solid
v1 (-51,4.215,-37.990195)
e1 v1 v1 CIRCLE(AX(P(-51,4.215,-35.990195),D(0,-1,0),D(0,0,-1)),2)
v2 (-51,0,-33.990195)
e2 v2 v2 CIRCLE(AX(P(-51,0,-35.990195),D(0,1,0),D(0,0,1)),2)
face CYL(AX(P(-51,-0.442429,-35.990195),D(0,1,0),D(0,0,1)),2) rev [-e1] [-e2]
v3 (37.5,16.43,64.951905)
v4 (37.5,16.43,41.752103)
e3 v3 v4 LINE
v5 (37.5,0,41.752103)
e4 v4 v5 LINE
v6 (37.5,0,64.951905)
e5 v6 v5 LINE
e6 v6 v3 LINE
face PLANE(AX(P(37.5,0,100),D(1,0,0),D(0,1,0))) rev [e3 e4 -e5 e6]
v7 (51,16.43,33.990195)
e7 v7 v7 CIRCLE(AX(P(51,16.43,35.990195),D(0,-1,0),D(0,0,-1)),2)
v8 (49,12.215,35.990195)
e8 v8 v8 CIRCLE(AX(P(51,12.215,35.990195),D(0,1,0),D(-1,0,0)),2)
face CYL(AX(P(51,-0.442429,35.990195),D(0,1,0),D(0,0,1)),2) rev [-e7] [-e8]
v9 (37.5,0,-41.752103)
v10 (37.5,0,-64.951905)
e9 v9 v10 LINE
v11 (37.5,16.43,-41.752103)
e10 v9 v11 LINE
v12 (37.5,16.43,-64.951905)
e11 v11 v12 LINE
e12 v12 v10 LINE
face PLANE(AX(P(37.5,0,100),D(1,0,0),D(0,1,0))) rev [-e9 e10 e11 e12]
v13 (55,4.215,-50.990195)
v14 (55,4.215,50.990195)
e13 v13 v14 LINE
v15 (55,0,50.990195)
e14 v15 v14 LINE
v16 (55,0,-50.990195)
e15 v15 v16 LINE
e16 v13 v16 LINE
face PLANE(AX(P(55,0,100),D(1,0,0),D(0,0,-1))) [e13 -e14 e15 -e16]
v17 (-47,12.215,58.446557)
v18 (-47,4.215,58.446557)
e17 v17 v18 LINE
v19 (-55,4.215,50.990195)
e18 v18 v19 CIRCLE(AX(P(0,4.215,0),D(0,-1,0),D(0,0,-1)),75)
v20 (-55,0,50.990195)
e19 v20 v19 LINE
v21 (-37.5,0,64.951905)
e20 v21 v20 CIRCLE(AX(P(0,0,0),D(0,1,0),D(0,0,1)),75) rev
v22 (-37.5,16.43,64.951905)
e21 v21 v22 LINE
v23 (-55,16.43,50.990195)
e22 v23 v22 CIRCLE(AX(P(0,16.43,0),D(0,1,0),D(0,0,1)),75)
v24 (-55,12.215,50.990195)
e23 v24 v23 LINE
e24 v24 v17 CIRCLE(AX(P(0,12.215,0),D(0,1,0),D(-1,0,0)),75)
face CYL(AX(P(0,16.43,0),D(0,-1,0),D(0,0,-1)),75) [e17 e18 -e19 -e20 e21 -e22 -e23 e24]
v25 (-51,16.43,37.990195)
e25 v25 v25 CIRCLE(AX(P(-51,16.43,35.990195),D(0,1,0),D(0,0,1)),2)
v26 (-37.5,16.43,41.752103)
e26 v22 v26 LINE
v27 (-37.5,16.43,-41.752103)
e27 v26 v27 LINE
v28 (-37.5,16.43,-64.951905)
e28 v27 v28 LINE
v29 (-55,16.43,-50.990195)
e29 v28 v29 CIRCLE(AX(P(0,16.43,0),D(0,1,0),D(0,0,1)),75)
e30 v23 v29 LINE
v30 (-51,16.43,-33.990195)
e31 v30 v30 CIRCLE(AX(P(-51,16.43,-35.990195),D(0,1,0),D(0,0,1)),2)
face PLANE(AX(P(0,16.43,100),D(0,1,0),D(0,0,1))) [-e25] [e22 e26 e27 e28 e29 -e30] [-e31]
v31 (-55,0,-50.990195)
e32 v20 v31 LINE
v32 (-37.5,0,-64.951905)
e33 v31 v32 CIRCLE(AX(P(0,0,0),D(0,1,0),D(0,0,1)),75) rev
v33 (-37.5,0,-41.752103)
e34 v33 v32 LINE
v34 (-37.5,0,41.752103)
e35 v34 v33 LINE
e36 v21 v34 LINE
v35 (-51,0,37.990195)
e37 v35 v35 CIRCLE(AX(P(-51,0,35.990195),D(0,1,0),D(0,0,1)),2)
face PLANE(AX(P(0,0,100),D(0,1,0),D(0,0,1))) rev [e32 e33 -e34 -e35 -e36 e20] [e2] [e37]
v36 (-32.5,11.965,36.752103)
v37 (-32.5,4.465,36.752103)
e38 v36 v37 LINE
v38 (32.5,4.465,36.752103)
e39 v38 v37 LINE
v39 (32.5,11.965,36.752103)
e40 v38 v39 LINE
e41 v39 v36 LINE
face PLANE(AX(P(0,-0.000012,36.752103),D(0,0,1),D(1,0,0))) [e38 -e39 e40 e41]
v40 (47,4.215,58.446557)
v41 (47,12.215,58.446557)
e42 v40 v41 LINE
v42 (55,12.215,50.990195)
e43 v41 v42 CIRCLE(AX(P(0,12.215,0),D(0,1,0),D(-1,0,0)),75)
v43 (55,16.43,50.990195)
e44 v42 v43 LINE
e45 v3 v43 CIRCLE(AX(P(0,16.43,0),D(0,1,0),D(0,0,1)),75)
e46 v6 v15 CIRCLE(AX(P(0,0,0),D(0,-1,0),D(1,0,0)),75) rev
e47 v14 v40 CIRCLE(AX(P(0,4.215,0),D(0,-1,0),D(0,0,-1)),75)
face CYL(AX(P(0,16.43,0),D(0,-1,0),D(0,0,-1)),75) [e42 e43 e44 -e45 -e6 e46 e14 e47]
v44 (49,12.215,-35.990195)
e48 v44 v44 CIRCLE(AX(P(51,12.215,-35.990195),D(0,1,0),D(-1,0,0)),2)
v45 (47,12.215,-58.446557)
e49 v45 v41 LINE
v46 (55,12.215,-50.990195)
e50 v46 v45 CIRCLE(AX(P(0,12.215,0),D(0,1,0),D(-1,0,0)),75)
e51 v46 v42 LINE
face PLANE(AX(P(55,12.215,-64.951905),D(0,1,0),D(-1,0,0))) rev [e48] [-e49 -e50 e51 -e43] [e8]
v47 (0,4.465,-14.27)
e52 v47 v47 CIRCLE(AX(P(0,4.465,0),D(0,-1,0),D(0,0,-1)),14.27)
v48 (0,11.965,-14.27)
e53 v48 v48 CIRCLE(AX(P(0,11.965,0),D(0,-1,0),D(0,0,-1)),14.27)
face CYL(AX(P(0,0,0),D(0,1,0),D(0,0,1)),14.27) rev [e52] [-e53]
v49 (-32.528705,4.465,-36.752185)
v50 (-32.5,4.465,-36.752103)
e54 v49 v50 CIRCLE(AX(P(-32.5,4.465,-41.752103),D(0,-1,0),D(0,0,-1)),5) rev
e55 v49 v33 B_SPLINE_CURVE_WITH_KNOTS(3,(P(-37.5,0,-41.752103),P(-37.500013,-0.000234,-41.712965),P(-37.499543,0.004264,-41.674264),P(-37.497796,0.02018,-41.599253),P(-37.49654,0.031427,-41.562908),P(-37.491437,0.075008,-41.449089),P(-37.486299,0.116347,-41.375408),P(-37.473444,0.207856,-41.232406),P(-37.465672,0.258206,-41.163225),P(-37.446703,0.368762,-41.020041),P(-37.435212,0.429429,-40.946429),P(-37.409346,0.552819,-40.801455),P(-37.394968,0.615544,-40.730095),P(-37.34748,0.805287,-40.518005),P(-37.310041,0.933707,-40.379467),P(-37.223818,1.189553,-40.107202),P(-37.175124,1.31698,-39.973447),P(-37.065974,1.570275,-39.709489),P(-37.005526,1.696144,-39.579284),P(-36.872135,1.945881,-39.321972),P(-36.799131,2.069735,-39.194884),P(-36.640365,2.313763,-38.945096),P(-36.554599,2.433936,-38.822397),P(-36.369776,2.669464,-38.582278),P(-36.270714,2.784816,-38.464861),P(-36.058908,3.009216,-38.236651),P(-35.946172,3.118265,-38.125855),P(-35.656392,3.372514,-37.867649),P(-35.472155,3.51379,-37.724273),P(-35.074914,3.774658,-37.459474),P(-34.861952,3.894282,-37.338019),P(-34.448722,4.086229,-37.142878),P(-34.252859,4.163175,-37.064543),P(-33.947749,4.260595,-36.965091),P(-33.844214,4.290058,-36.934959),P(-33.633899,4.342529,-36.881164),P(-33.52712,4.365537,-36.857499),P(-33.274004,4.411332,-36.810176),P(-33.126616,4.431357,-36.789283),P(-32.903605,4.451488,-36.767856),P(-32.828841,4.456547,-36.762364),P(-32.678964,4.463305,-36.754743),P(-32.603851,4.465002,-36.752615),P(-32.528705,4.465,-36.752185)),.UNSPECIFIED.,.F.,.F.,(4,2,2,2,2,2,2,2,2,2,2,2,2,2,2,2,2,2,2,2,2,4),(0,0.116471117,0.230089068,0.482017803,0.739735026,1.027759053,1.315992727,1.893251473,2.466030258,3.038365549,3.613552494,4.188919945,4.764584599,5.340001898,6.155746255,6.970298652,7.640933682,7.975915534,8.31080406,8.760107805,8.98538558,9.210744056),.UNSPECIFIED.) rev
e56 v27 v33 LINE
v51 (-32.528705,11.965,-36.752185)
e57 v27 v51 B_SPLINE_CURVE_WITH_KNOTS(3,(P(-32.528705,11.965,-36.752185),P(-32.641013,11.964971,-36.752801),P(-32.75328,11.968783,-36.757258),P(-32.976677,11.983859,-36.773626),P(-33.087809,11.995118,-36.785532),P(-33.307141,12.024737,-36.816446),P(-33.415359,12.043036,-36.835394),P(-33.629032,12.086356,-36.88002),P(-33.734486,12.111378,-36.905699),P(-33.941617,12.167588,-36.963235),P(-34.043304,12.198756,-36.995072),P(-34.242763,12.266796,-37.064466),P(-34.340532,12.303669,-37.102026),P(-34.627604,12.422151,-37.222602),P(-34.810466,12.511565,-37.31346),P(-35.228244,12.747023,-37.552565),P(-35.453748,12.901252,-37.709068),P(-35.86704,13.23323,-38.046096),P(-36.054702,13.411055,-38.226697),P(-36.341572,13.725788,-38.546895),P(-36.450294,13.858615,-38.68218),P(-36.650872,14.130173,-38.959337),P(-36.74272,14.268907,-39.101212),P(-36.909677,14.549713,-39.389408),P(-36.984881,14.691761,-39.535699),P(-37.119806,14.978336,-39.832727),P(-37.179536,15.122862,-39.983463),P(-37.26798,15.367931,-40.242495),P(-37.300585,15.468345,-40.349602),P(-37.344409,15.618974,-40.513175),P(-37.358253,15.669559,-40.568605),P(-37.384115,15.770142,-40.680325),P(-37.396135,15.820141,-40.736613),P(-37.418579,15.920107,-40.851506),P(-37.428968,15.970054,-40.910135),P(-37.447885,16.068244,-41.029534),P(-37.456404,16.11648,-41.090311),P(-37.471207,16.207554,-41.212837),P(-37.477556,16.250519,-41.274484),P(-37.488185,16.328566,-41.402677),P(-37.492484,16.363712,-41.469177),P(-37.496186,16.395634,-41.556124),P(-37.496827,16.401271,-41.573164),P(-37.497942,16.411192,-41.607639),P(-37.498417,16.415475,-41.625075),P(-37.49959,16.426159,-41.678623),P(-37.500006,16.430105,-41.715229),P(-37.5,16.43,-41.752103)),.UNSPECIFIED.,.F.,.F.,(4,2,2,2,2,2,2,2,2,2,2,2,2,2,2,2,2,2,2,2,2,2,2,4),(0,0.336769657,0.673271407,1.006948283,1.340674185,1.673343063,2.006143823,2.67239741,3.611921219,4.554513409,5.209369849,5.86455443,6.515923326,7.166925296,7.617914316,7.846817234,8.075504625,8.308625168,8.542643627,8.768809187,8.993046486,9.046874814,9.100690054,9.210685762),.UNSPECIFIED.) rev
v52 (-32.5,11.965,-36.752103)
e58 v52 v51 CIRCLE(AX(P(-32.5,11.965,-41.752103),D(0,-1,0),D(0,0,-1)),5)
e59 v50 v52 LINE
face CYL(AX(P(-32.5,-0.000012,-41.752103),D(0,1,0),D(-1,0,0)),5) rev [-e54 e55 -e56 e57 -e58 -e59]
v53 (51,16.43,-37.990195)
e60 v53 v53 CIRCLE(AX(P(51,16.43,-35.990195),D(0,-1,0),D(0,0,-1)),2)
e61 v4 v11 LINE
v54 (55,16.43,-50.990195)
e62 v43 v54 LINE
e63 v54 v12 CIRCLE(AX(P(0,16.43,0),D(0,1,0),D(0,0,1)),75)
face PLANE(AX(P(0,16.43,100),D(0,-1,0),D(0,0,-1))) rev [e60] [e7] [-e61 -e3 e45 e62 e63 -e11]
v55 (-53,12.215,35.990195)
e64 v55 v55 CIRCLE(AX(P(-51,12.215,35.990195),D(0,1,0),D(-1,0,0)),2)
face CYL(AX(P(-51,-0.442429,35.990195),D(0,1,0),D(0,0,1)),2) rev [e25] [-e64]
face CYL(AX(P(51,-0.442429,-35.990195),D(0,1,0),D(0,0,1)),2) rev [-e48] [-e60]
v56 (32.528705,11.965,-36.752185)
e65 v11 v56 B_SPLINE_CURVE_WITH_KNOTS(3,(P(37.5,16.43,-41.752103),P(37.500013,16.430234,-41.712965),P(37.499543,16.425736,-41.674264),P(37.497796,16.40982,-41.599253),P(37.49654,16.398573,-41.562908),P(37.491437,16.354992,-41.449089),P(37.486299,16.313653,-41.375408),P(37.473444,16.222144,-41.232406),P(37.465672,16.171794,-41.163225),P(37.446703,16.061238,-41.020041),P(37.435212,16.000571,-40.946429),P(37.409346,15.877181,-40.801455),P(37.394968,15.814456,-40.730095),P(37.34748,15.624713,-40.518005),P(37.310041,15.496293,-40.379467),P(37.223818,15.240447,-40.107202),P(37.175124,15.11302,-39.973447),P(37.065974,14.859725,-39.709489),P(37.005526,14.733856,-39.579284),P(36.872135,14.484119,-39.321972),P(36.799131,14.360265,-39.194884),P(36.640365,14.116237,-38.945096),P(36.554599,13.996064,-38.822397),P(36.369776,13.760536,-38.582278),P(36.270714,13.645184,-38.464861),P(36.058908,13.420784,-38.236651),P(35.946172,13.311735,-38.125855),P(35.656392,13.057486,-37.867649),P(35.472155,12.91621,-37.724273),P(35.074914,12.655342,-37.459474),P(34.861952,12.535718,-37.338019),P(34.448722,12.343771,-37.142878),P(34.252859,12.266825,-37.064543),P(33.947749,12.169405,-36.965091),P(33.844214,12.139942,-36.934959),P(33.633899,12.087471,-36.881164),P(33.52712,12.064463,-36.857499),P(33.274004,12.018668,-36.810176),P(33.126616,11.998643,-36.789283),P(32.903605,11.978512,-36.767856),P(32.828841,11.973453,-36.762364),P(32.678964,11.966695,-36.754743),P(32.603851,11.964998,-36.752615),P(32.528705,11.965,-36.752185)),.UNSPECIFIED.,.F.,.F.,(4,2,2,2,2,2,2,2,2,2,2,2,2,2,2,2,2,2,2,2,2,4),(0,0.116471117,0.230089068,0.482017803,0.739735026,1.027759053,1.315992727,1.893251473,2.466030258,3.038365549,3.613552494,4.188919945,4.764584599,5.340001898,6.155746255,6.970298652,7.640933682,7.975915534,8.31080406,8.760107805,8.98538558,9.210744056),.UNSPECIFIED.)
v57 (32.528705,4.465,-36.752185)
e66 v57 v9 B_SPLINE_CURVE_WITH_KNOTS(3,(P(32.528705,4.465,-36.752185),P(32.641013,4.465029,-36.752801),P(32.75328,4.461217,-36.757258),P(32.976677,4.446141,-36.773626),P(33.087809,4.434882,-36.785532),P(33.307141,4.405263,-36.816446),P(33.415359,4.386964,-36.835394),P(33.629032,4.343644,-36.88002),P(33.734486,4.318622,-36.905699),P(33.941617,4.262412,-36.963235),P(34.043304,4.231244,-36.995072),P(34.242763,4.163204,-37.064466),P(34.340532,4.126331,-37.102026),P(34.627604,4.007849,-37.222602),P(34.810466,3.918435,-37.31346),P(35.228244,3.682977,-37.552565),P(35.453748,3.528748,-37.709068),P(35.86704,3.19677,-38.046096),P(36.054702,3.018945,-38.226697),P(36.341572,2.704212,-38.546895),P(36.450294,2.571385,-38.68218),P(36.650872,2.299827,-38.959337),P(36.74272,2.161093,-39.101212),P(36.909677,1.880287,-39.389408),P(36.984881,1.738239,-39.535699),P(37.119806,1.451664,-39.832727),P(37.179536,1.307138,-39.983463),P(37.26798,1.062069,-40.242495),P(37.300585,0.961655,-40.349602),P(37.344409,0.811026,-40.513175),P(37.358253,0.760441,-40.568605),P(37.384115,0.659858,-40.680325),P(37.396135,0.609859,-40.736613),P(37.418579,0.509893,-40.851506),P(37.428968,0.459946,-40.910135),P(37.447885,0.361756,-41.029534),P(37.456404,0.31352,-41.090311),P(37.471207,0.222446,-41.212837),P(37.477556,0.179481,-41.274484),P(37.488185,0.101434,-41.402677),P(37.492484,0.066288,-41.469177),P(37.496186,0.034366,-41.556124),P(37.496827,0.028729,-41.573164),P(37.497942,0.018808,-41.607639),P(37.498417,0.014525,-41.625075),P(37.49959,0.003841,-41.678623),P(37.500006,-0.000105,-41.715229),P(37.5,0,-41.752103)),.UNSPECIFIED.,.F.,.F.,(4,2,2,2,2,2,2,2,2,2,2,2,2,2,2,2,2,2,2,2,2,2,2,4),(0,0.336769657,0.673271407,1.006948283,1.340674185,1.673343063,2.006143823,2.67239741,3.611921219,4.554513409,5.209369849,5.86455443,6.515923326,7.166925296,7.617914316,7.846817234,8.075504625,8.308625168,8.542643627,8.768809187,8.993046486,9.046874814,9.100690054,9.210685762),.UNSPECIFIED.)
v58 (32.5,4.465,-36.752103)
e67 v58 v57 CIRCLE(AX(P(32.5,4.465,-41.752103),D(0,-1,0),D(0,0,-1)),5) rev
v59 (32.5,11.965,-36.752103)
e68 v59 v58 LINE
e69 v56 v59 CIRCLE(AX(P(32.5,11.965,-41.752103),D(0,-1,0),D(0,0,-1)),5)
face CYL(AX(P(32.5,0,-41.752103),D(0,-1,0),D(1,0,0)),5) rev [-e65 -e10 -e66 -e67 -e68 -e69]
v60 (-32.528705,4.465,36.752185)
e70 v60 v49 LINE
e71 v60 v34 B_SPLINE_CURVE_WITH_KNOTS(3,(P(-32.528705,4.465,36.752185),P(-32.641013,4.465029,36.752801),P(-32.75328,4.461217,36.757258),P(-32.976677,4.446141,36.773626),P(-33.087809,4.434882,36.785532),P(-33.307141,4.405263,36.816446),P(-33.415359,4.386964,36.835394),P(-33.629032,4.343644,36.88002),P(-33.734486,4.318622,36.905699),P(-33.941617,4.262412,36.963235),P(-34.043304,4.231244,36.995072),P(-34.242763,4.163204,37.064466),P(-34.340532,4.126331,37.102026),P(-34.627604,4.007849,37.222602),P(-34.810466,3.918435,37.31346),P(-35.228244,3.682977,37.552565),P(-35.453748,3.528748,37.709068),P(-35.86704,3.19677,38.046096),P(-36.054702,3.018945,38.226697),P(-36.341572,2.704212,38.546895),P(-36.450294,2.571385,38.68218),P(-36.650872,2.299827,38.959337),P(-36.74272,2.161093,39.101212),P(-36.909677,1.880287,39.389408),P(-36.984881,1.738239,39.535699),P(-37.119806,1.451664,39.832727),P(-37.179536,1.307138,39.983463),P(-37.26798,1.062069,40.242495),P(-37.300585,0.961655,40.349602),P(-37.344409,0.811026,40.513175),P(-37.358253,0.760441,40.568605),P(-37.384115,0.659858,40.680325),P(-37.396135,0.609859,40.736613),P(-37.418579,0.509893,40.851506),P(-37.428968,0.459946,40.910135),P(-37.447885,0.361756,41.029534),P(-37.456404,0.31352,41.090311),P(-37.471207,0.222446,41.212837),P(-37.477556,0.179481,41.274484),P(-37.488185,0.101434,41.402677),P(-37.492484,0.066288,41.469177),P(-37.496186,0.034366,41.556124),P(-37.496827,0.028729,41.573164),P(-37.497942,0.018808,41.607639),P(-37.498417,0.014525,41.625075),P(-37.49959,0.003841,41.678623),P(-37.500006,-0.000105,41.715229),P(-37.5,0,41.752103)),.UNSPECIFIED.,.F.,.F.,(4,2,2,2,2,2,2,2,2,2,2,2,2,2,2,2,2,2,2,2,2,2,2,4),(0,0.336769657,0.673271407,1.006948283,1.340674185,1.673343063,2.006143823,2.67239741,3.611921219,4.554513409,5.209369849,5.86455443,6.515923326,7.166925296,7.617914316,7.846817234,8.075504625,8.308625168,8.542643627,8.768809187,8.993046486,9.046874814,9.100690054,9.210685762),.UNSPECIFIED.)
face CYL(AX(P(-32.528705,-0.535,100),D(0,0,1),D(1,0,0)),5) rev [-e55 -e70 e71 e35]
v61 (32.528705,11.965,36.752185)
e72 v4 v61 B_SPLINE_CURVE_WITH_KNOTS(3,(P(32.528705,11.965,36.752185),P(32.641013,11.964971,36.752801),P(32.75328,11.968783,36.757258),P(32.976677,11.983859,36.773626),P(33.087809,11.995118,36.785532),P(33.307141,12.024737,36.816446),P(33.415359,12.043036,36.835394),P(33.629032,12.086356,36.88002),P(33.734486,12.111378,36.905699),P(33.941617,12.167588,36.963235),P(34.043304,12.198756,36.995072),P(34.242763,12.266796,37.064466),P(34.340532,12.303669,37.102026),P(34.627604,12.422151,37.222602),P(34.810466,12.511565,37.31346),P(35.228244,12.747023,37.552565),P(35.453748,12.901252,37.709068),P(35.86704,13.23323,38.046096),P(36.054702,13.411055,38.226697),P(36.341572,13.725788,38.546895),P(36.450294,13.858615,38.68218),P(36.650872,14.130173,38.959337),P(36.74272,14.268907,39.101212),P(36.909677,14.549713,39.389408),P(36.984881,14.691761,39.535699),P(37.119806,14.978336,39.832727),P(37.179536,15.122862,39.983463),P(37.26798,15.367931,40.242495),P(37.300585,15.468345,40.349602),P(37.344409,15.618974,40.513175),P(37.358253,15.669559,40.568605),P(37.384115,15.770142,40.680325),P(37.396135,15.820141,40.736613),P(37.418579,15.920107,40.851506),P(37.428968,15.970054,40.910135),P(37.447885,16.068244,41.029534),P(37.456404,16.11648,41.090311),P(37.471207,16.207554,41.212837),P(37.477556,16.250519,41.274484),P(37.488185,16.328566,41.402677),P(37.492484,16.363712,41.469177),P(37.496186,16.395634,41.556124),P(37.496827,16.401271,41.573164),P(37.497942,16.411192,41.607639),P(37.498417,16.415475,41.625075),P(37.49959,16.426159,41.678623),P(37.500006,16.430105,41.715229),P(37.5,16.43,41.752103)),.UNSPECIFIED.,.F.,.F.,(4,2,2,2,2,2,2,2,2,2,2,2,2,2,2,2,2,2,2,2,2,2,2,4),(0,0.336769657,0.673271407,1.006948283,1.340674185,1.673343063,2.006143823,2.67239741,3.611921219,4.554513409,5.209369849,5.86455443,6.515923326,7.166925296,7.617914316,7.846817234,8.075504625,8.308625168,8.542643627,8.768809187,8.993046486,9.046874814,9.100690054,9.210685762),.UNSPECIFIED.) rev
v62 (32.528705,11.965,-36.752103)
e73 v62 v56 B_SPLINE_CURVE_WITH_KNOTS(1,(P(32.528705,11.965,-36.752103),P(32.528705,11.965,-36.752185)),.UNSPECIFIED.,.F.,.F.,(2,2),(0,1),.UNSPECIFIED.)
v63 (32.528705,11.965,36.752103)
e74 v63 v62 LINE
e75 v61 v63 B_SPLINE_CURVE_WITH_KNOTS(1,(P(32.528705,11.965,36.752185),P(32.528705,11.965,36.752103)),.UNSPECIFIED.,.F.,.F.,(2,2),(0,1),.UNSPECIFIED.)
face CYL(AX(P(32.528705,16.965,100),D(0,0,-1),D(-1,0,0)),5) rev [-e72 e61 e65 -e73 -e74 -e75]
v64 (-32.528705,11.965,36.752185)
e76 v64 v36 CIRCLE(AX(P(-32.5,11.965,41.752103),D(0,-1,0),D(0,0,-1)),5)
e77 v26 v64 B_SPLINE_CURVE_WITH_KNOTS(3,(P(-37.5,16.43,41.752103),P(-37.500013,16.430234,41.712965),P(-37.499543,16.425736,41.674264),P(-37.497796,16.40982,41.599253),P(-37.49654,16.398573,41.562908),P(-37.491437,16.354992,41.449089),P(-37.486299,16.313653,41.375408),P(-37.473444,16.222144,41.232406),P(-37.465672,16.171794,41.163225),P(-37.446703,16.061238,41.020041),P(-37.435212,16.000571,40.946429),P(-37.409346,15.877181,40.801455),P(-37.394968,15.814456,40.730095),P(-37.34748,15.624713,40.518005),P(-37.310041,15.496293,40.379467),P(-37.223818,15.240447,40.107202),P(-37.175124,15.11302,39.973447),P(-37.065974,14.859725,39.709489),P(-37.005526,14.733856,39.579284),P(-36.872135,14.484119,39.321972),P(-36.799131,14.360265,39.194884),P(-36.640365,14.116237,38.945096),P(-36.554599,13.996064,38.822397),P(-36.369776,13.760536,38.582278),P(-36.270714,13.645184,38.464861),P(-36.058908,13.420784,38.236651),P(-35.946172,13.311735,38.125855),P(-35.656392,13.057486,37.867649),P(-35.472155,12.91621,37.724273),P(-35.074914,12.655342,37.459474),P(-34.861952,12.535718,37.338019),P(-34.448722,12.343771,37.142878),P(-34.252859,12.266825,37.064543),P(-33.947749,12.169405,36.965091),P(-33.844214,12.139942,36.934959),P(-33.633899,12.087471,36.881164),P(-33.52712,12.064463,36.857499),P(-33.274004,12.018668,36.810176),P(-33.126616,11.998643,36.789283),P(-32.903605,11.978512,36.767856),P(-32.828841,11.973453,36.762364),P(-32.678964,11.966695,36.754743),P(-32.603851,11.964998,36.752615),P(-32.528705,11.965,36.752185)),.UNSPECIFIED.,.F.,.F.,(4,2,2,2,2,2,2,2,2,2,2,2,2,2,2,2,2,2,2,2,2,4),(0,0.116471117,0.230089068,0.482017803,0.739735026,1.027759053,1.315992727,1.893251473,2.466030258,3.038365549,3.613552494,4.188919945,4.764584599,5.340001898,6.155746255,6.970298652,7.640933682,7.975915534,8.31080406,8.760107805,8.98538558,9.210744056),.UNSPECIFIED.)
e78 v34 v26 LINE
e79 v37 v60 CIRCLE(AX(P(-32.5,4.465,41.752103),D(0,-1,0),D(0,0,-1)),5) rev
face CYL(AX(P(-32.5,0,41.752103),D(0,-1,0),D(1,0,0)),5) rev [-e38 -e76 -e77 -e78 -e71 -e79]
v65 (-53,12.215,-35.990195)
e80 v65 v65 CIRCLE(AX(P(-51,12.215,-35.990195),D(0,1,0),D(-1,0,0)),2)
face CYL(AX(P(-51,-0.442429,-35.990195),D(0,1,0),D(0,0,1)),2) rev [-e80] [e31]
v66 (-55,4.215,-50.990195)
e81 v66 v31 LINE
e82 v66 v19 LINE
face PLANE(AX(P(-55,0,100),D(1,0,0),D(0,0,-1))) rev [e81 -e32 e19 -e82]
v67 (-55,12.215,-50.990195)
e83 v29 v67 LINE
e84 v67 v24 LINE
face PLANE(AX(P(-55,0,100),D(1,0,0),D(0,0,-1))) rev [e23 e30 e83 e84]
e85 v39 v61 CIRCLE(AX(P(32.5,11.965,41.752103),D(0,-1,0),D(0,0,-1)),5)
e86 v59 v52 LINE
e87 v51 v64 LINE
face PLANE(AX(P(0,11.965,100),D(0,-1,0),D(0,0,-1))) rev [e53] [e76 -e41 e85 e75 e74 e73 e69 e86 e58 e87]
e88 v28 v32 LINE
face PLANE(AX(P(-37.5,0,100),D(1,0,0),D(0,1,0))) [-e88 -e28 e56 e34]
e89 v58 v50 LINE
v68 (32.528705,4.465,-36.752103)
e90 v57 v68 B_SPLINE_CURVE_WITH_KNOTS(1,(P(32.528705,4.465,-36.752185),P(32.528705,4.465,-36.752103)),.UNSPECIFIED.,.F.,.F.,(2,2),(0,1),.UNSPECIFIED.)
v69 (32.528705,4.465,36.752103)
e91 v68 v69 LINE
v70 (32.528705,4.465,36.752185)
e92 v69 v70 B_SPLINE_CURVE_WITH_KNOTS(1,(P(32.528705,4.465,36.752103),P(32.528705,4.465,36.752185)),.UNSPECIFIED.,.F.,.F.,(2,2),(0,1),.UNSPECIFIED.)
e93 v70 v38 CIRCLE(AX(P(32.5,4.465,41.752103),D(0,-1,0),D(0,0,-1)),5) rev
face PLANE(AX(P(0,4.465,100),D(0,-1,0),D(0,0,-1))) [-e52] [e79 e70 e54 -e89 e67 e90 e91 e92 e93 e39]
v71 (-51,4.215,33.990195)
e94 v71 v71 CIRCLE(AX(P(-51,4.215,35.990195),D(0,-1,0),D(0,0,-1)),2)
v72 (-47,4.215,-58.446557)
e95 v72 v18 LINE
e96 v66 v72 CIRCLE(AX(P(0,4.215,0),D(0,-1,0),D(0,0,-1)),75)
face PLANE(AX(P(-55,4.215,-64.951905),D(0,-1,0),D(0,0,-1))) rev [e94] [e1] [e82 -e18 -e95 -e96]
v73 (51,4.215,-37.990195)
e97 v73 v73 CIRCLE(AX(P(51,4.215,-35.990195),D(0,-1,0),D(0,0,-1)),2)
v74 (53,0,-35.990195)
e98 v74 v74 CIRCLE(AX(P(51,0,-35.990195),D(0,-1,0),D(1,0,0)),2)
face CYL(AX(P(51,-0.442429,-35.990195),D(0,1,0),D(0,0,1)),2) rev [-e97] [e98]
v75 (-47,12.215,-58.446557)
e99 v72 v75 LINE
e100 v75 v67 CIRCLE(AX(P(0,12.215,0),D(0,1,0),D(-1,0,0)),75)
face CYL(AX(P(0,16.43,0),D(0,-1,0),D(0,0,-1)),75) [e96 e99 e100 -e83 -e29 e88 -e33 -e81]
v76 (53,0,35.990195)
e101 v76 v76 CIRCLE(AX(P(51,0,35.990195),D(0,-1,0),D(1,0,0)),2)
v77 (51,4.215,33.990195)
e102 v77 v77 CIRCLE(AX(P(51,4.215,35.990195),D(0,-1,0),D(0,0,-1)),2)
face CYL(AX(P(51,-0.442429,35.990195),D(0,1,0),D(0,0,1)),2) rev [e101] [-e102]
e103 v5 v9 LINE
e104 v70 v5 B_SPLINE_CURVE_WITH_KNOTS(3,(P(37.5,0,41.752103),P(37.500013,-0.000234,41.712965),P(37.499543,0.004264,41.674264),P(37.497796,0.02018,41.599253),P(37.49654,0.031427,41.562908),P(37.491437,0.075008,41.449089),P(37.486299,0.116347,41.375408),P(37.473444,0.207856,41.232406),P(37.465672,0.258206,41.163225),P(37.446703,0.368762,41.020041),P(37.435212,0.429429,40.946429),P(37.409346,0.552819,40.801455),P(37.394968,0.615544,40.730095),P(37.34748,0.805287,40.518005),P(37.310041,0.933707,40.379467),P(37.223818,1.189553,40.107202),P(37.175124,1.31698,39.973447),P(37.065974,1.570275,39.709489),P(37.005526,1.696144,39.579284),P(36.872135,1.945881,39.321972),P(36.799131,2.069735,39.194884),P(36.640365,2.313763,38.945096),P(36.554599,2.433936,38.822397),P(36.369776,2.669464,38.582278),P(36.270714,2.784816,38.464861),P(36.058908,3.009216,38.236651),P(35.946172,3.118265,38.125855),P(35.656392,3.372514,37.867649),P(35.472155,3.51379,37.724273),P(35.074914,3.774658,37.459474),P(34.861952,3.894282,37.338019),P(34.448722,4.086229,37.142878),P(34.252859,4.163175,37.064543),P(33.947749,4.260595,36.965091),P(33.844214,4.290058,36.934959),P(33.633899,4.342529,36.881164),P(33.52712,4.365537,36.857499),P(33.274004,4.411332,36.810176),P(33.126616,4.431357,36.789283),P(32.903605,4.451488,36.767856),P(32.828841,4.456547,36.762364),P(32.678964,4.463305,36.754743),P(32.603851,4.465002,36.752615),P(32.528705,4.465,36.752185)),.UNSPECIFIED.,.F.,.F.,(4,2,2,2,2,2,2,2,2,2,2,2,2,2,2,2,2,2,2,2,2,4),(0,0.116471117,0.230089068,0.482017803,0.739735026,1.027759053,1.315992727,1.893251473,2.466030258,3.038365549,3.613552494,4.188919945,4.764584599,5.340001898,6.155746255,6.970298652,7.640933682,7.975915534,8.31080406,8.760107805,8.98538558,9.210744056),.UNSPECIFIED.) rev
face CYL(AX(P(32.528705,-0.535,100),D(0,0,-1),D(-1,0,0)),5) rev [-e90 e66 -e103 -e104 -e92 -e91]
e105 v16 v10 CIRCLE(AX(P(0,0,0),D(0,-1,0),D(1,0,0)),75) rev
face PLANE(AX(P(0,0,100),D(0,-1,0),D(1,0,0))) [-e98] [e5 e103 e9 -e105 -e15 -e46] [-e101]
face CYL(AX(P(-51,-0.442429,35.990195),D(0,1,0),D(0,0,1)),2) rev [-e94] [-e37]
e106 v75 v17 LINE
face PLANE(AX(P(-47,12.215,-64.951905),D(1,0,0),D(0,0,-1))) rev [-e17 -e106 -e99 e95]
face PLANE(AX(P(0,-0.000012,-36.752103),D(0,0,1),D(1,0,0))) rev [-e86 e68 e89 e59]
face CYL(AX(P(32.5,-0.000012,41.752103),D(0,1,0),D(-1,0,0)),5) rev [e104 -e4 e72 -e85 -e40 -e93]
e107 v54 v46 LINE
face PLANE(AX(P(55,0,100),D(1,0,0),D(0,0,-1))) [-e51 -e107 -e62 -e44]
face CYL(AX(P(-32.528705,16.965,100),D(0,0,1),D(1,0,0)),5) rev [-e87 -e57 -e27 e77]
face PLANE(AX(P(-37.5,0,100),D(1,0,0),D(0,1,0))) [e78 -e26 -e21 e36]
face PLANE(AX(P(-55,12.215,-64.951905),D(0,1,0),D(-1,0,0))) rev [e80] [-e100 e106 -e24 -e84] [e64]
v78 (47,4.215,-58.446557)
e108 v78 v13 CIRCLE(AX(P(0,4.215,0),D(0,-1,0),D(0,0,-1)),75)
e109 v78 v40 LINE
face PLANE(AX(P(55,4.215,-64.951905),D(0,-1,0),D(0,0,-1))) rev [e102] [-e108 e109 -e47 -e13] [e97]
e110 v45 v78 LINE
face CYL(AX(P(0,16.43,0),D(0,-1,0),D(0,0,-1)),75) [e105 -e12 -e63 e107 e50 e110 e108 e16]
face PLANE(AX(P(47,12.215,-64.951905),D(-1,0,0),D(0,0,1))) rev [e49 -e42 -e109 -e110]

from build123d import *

# Parameters (mm, degrees)
SALIENTE_EXTRUIR1_DEPTH    = 100
CORTAR_EXTRUIR1_DEPTH      = 116.30370722574361
CORTAR_EXTRUIR1_DEPTH_BACK = 116.30370722574361
CROQUIS4_OUTSIDE_W         = 157.768
CROQUIS4_OUTSIDE_H         = 247.76800000000003
CROQUIS4_OUTSIDE_R         = 75.00000000000001
CORTAR_EXTRUIR2_DEPTH      = 95.44545992264534
CORTAR_EXTRUIR2_DEPTH_BACK = 95.44545992264534
CORTAR_EXTRUIR3_DEPTH      = 86.94714204090798
CORTAR_EXTRUIR3_DEPTH_BACK = 86.94714204090798
CROQUIS5_R                 = 14.27
REDONDEO1_R                = 5
CORTAR_EXTRUIR4_DEPTH      = 87.68157187826033
CORTAR_EXTRUIR4_DEPTH_BACK = 87.68157187826033
CORTAR_EXTRUIR5_DEPTH      = 86.98230182684696
CORTAR_EXTRUIR5_DEPTH_BACK = 86.98230182684696
CROQUIS8_R                 = 2.0000000000000036


with BuildPart() as part:
    # Croquis3 → Saliente-Extruir1 (new, symmetric)
    with BuildSketch(Plane.XY):
        Polygon((37.50000000000001, 4.465), (0, 4.465), (-37.50000000000001, 4.465), (-37.5, 0), (-54.99999999999999, 0), (-54.99999999999999, 6.5), (-54.99999999999999, 16.43), (-37.5, 16.43), (-37.50000000000001, 11.965), (0, 11.965), (37.50000000000001, 11.965), (37.5, 16.43), (54.99999999999999, 16.43), (54.99999999999999, 0), (37.5, 0), align=None)
    extrude(amount=SALIENTE_EXTRUIR1_DEPTH, both=True)

    # Croquis4 outside → Cortar-Extruir1 (cut, two sides: drawn at the far end of the back side and taken through both)
    with BuildSketch(Plane(origin=(0, 0, 0), x_dir=(1, 0, 0), z_dir=(0, 1, 0)).offset(-CORTAR_EXTRUIR1_DEPTH_BACK)):
        Rectangle(CROQUIS4_OUTSIDE_W, CROQUIS4_OUTSIDE_H)
        Circle(CROQUIS4_OUTSIDE_R, mode=Mode.SUBTRACT)
    extrude(amount=CORTAR_EXTRUIR1_DEPTH + CORTAR_EXTRUIR1_DEPTH_BACK, mode=Mode.SUBTRACT)

    # Croquis4<3> → Cortar-Extruir2 (cut, two sides: drawn at the far end of the back side and taken through both)
    with BuildSketch(Plane(origin=(0, 0, 0), x_dir=(1, 0, 0), z_dir=(0, 1, 0)).offset(-CORTAR_EXTRUIR2_DEPTH_BACK)):
        with BuildLine():
            ThreePointArc((37.500000000000966, 64.95190528383236), (1.17033e-12, 75.00000000000001), (-37.499999999998956, 64.95190528383351))
            Line((-37.50000000000001, 64.95190528383388), (-37.50000000000001, 36.752103032136134))
            Line((-37.50000000000001, 36.752103032136134), (37.50000000000001, 36.752103032136134))
            Line((37.50000000000001, 36.752103032136134), (37.50000000000001, 64.95190528383202))
        make_face()
        with BuildLine():
            Line((-37.50000000000001, -36.752103032136134), (-37.50000000000001, -64.95190528383385))
            ThreePointArc((-37.499999999999, -64.95190528383348), (1.18526e-12, -75.00000000000001), (37.50000000000099, -64.95190528383235))
            Line((37.50000000000001, -64.951905283832), (37.50000000000001, -36.752103032136134))
            Line((37.50000000000001, -36.752103032136134), (-37.50000000000001, -36.752103032136134))
        make_face()
    extrude(amount=CORTAR_EXTRUIR2_DEPTH + CORTAR_EXTRUIR2_DEPTH_BACK, mode=Mode.SUBTRACT)

    # Croquis5 → Cortar-Extruir3 (cut, two sides: drawn at the far end of the back side and taken through both)
    with BuildSketch(Plane(origin=(0, 11.965, 0), x_dir=(1, 0, 0), z_dir=(0, 1, 0)).offset(-CORTAR_EXTRUIR3_DEPTH_BACK)):
        with Locations(Location((0, 0, 0), (0, 0, 90))):
            Circle(CROQUIS5_R)
    extrude(amount=CORTAR_EXTRUIR3_DEPTH + CORTAR_EXTRUIR3_DEPTH_BACK, mode=Mode.SUBTRACT)

    # Redondeo1
    # the kernel refuses this fillet: 5 mm, written as the material it adds along each edge
    with BuildSketch(Plane(origin=(-37.50000000000001, 4.465, 36.752103032136134), x_dir=(1, 0, 0), z_dir=(0, 0, -1))) as redondeo1_piece_1:
        with BuildLine():
            CenterArc((4.971295102888192, 5), REDONDEO1_R, 186.14240739101976, 83.85759260898021)
            Line((1.421e-14, 4.465000000000001), (-0.09942590205774593, 4.454300000000001))
            ThreePointArc((-0.09942590205774593, 4.454300000000001), (-0.09999999999999432, 2.2325000000000004), (-0.10000000000000142, 0))
            Line((-0.10000000000000142, 0), (0, -0.09999999999999964))
            Line((0, -0.09999999999999964), (4.971295102888192, -0.09999999999999964))
            Line((4.971295102888192, -0.09999999999999964), (4.971295102888192, 0))
        make_face()
    extrude(amount=73.50420606427225)
    with BuildSketch(Plane(origin=(-37.50000000000001, 11.965, 36.752103032136134), x_dir=(1, 0, 0), z_dir=(0, 0, -1))) as redondeo1_piece_2:
        with BuildLine():
            CenterArc((4.971295102888185, -5), REDONDEO1_R, 90, 83.85759260898024)
            Line((7.11e-15, -4.465), (-0.09942590205775304, -4.4543))
            ThreePointArc((-0.09942590205775304, -4.4543), (-0.10000000000001563, -2.2325000000000017), (-0.10000000000000142, 0))
            Line((-0.10000000000000142, 0), (0, 0.09999999999999964))
            Line((0, 0.09999999999999964), (4.971295102888185, 0.09999999999999964))
            Line((4.971295102888185, 0.09999999999999964), (4.971295102888185, 0))
        make_face()
    extrude(amount=73.50420606427225)
    with BuildSketch(Plane(origin=(37.50000000000001, 11.965, 36.752103032136134), x_dir=(-3.18e-15, 1, 0), z_dir=(0, 0, -1))) as redondeo1_piece_3:
        with BuildLine():
            CenterArc((5.000000000000016, -4.971295102888176), REDONDEO1_R, 96.14240739101996, 83.85759260898021)
            Line((1.582e-14, -4.971295102888192), (-0.09999999999998382, -4.971295102888192))
            Line((-0.09999999999998382, -4.971295102888192), (-0.09999999999999964, -3.2e-16))
            Line((-0.09999999999999964, -3.2e-16), (-3.2e-16, 0.10000000000000142))
            ThreePointArc((-3.2e-16, 0.10000000000000142), (2.2324999999999995, 0.10000000000002274), (4.4543, 0.09942590205776011))
            Line((4.4543, 0.09942590205776011), (4.465, 0))
        make_face()
    extrude(amount=73.50420606427225)
    with BuildSketch(Plane(origin=(37.50000000000001, 4.465, -36.752103032136134), x_dir=(-1.59e-15, -1, 0), z_dir=(0, 0, 1))) as redondeo1_piece_4:
        with BuildLine():
            CenterArc((5.000000000000008, -4.971295102888177), REDONDEO1_R, 96.14240739101987, 83.85759260898021)
            Line((7.91e-15, -4.971295102888185), (-0.09999999999999173, -4.971295102888185))
            Line((-0.09999999999999173, -4.971295102888185), (-0.09999999999999964, -1.6e-16))
            Line((-0.09999999999999964, -1.6e-16), (-1.6e-16, 0.10000000000000142))
            ThreePointArc((-1.6e-16, 0.10000000000000142), (2.2325, 0.09999999999999787), (4.4543, 0.09942590205776013))
            Line((4.4543, 0.09942590205776013), (4.465, 0))
        make_face()
    extrude(amount=73.50420606427225)
    with BuildSketch(Plane(origin=(37.50000000000001, 4.465000000000003, -36.752103032136134), x_dir=(0, 0, -1), z_dir=(0, 1, 0)), Plane(origin=(-37.50000000000001, 4.465000000000003, -36.752103032136134), x_dir=(1, 0, 0), z_dir=(0, 1, 0)), Plane(origin=(-37.50000000000001, 11.965000000000003, 36.752103032136134), x_dir=(1, 0, 0), z_dir=(0, -1, 0))) as redondeo1_piece_5:
        with BuildLine():
            CenterArc((REDONDEO1_R, REDONDEO1_R), REDONDEO1_R, 180, 90)
            Line((0, REDONDEO1_R), (-REDONDEO1_R * 0.02, REDONDEO1_R))
            Line((-REDONDEO1_R * 0.02, REDONDEO1_R), (-REDONDEO1_R * 0.02, -REDONDEO1_R * 0.02))
            Line((-REDONDEO1_R * 0.02, -REDONDEO1_R * 0.02), (REDONDEO1_R, -REDONDEO1_R * 0.02))
            Line((REDONDEO1_R, -REDONDEO1_R * 0.02), (REDONDEO1_R, 0))
        make_face()
    extrude(amount=7.5)
    with BuildSketch(Plane(origin=(37.50000000000001, 4.465000000000003, 36.752103032136134), x_dir=(0, 0, 1), z_dir=(0, 1, 0))) as redondeo1_piece_6:
        with BuildLine():
            CenterArc((REDONDEO1_R, -REDONDEO1_R), REDONDEO1_R, 90, 90)
            Line((0, -REDONDEO1_R), (-REDONDEO1_R * 0.02, -REDONDEO1_R))
            Line((-REDONDEO1_R * 0.02, -REDONDEO1_R), (-REDONDEO1_R * 0.02, REDONDEO1_R * 0.02))
            Line((-REDONDEO1_R * 0.02, REDONDEO1_R * 0.02), (REDONDEO1_R, REDONDEO1_R * 0.02))
            Line((REDONDEO1_R, REDONDEO1_R * 0.02), (REDONDEO1_R, 0))
        make_face()
    extrude(amount=7.5)
    with BuildSketch(Plane(origin=(-37.50000000000001, 4.465, 49.18034078935661), x_dir=(1, 0, 0), z_dir=(0, 0, -1))) as redondeo1_piece_7a_section:
        with BuildLine():
            CenterArc((4.971295102888192, 5), REDONDEO1_R, 186.14240739101976, 83.85759260898021)
            Line((1.421e-14, 4.465000000000001), (-0.09942590205774593, 4.454300000000001))
            ThreePointArc((-0.09942590205774593, 4.454300000000001), (-0.09999999999999432, 2.2325000000000004), (-0.10000000000000142, 0))
            Line((-0.10000000000000142, 0), (0, -0.09999999999999964))
            Line((0, -0.09999999999999964), (4.971295102888192, -0.09999999999999964))
            Line((4.971295102888192, -0.09999999999999964), (4.971295102888192, 0))
        make_face()
    redondeo1_piece_7a = extrude(amount=85.93244382149274, mode=Mode.PRIVATE)
    redondeo1_piece_7a = split(redondeo1_piece_7a, bisect_by=Plane(origin=(-36.3586151753133, 3.3888910870281705, 36.752103032136134), z_dir=(0, 0, 1)), keep=Keep.TOP, mode=Mode.PRIVATE)
    with BuildSketch(Plane(origin=(-37.50000000000001, 11.965000000000003, 36.752103032136134), x_dir=(1, 0, 0), z_dir=(0, -1, 0))) as redondeo1_piece_7b_section:
        with BuildLine():
            CenterArc((REDONDEO1_R, REDONDEO1_R), REDONDEO1_R, 180, 90)
            Line((0, REDONDEO1_R), (-REDONDEO1_R * 0.02, REDONDEO1_R))
            Line((-REDONDEO1_R * 0.02, REDONDEO1_R), (-REDONDEO1_R * 0.02, -REDONDEO1_R * 0.02))
            Line((-REDONDEO1_R * 0.02, -REDONDEO1_R * 0.02), (REDONDEO1_R, -REDONDEO1_R * 0.02))
            Line((REDONDEO1_R, -REDONDEO1_R * 0.02), (REDONDEO1_R, 0))
        make_face()
    redondeo1_piece_7b = extrude(amount=20, mode=Mode.PRIVATE)
    redondeo1_piece_7b = split(redondeo1_piece_7b, bisect_by=Plane(origin=(-36.3680244286659, 4.465, 37.884078603470265), z_dir=(0, -1, 0)), keep=Keep.TOP, mode=Mode.PRIVATE)
    redondeo1_piece_7b = split(redondeo1_piece_7b, bisect_by=Plane(origin=(-36.368024428665905, 0, 37.884078603470265), z_dir=(0, 1, 0)), keep=Keep.TOP, mode=Mode.PRIVATE)
    redondeo1_piece_7 = redondeo1_piece_7a & redondeo1_piece_7b
    add(redondeo1_piece_7)
    with BuildSketch(Plane(origin=(-37.50000000000001, 4.465, 36.752103032136134), x_dir=(1, 0, 0), z_dir=(0, 0, -1))) as redondeo1_piece_8a_section:
        with BuildLine():
            CenterArc((4.971295102888192, 5), REDONDEO1_R, 186.14240739101976, 83.85759260898021)
            Line((1.421e-14, 4.465000000000001), (-0.09942590205774593, 4.454300000000001))
            ThreePointArc((-0.09942590205774593, 4.454300000000001), (-0.09999999999999432, 2.2325000000000004), (-0.10000000000000142, 0))
            Line((-0.10000000000000142, 0), (0, -0.09999999999999964))
            Line((0, -0.09999999999999964), (4.971295102888192, -0.09999999999999964))
            Line((4.971295102888192, -0.09999999999999964), (4.971295102888192, 0))
        make_face()
    redondeo1_piece_8a = extrude(amount=85.93244382149273, mode=Mode.PRIVATE)
    redondeo1_piece_8a = split(redondeo1_piece_8a, bisect_by=Plane(origin=(-36.35861517531315, 3.3888910870273232, -36.752103032136134), z_dir=(0, 0, -1)), keep=Keep.TOP, mode=Mode.PRIVATE)
    with BuildSketch(Plane(origin=(-37.499999999999986, -8.034999999999997, -36.752103032136134), x_dir=(1, 0, 0), z_dir=(0, 1, 0))) as redondeo1_piece_8b_section:
        with BuildLine():
            CenterArc((REDONDEO1_R, REDONDEO1_R), REDONDEO1_R, 180, 90)
            Line((0, REDONDEO1_R), (-REDONDEO1_R * 0.02, REDONDEO1_R))
            Line((-REDONDEO1_R * 0.02, REDONDEO1_R), (-REDONDEO1_R * 0.02, -REDONDEO1_R * 0.02))
            Line((-REDONDEO1_R * 0.02, -REDONDEO1_R * 0.02), (REDONDEO1_R, -REDONDEO1_R * 0.02))
            Line((REDONDEO1_R, -REDONDEO1_R * 0.02), (REDONDEO1_R, 0))
        make_face()
    redondeo1_piece_8b = extrude(amount=20, mode=Mode.PRIVATE)
    redondeo1_piece_8b = split(redondeo1_piece_8b, bisect_by=Plane(origin=(-36.36802442866587, 4.465, -37.884078603470265), z_dir=(0, -1, 0)), keep=Keep.TOP, mode=Mode.PRIVATE)
    redondeo1_piece_8b = split(redondeo1_piece_8b, bisect_by=Plane(origin=(-36.36802442866587, 0, -37.884078603470265), z_dir=(0, 1, 0)), keep=Keep.TOP, mode=Mode.PRIVATE)
    redondeo1_piece_8 = redondeo1_piece_8a & redondeo1_piece_8b
    add(redondeo1_piece_8)
    with BuildSketch(Plane(origin=(-37.500000000000036, 24.465000000000003, 36.752103032136134), x_dir=(1, 0, 0), z_dir=(0, -1, 0))) as redondeo1_piece_9a_section:
        with BuildLine():
            CenterArc((REDONDEO1_R, REDONDEO1_R), REDONDEO1_R, 180, 90)
            Line((0, REDONDEO1_R), (-REDONDEO1_R * 0.02, REDONDEO1_R))
            Line((-REDONDEO1_R * 0.02, REDONDEO1_R), (-REDONDEO1_R * 0.02, -REDONDEO1_R * 0.02))
            Line((-REDONDEO1_R * 0.02, -REDONDEO1_R * 0.02), (REDONDEO1_R, -REDONDEO1_R * 0.02))
            Line((REDONDEO1_R, -REDONDEO1_R * 0.02), (REDONDEO1_R, 0))
        make_face()
    redondeo1_piece_9a = extrude(amount=20, mode=Mode.PRIVATE)
    redondeo1_piece_9a = split(redondeo1_piece_9a, bisect_by=Plane(origin=(-36.36802442866591, 11.965, 37.884078603470265), z_dir=(0, 1, 0)), keep=Keep.TOP, mode=Mode.PRIVATE)
    redondeo1_piece_9a = split(redondeo1_piece_9a, bisect_by=Plane(origin=(-36.36802442866591, 16.43, 37.884078603470265), z_dir=(0, -1, 0)), keep=Keep.TOP, mode=Mode.PRIVATE)
    with BuildSketch(Plane(origin=(-37.50000000000002, 11.965, 49.18034078935659), x_dir=(1, 0, 0), z_dir=(0, 0, -1))) as redondeo1_piece_9b_section:
        with BuildLine():
            CenterArc((4.971295102888199, -5), REDONDEO1_R, 90, 83.85759260898024)
            Line((2.132e-14, -4.465), (-0.09942590205773882, -4.4543))
            ThreePointArc((-0.09942590205773882, -4.4543), (-0.10000000000000142, -2.2325000000000017), (-0.10000000000000142, 0))
            Line((-0.10000000000000142, 0), (0, 0.09999999999999964))
            Line((0, 0.09999999999999964), (4.971295102888199, 0.09999999999999964))
            Line((4.971295102888199, 0.09999999999999964), (4.971295102888199, 0))
        make_face()
    redondeo1_piece_9b = extrude(amount=85.93244382149271, mode=Mode.PRIVATE)
    redondeo1_piece_9b = split(redondeo1_piece_9b, bisect_by=Plane(origin=(-36.35861517531264, 13.04110891296965, 36.752103032136134), z_dir=(0, 0, 1)), keep=Keep.TOP, mode=Mode.PRIVATE)
    redondeo1_piece_9 = redondeo1_piece_9a & redondeo1_piece_9b
    add(redondeo1_piece_9)
    with BuildSketch(Plane(origin=(-37.50000000000001, 11.965, 36.752103032136134), x_dir=(1, 0, 0), z_dir=(0, 0, -1))) as redondeo1_piece_10a_section:
        with BuildLine():
            CenterArc((4.971295102888185, -5), REDONDEO1_R, 90, 83.85759260898024)
            Line((7.11e-15, -4.465), (-0.09942590205775304, -4.4543))
            ThreePointArc((-0.09942590205775304, -4.4543), (-0.10000000000001563, -2.2325000000000017), (-0.10000000000000142, 0))
            Line((-0.10000000000000142, 0), (0, 0.09999999999999964))
            Line((0, 0.09999999999999964), (4.971295102888185, 0.09999999999999964))
            Line((4.971295102888185, 0.09999999999999964), (4.971295102888185, 0))
        make_face()
    redondeo1_piece_10a = extrude(amount=85.93244382149273, mode=Mode.PRIVATE)
    redondeo1_piece_10a = split(redondeo1_piece_10a, bisect_by=Plane(origin=(-36.35861517531267, 13.041108912969635, -36.752103032136134), z_dir=(0, 0, -1)), keep=Keep.TOP, mode=Mode.PRIVATE)
    with BuildSketch(Plane(origin=(-37.50000000000001, 4.465000000000003, -36.752103032136134), x_dir=(1, 0, 0), z_dir=(0, 1, 0))) as redondeo1_piece_10b_section:
        with BuildLine():
            CenterArc((REDONDEO1_R, REDONDEO1_R), REDONDEO1_R, 180, 90)
            Line((0, REDONDEO1_R), (-REDONDEO1_R * 0.02, REDONDEO1_R))
            Line((-REDONDEO1_R * 0.02, REDONDEO1_R), (-REDONDEO1_R * 0.02, -REDONDEO1_R * 0.02))
            Line((-REDONDEO1_R * 0.02, -REDONDEO1_R * 0.02), (REDONDEO1_R, -REDONDEO1_R * 0.02))
            Line((REDONDEO1_R, -REDONDEO1_R * 0.02), (REDONDEO1_R, 0))
        make_face()
    redondeo1_piece_10b = extrude(amount=20, mode=Mode.PRIVATE)
    redondeo1_piece_10b = split(redondeo1_piece_10b, bisect_by=Plane(origin=(-36.36802442866587, 11.965, -37.88407860347027), z_dir=(0, 1, 0)), keep=Keep.TOP, mode=Mode.PRIVATE)
    redondeo1_piece_10b = split(redondeo1_piece_10b, bisect_by=Plane(origin=(-36.36802442866587, 16.43, -37.88407860347027), z_dir=(0, -1, 0)), keep=Keep.TOP, mode=Mode.PRIVATE)
    redondeo1_piece_10 = redondeo1_piece_10a & redondeo1_piece_10b
    add(redondeo1_piece_10)
    with BuildSketch(Plane(origin=(37.50000000000001, 4.465000000000003, 36.752103032136134), x_dir=(0, 0, 1), z_dir=(0, 1, 0))) as redondeo1_piece_11a_section:
        with BuildLine():
            CenterArc((REDONDEO1_R, -REDONDEO1_R), REDONDEO1_R, 90, 90)
            Line((0, -REDONDEO1_R), (-REDONDEO1_R * 0.02, -REDONDEO1_R))
            Line((-REDONDEO1_R * 0.02, -REDONDEO1_R), (-REDONDEO1_R * 0.02, REDONDEO1_R * 0.02))
            Line((-REDONDEO1_R * 0.02, REDONDEO1_R * 0.02), (REDONDEO1_R, REDONDEO1_R * 0.02))
            Line((REDONDEO1_R, REDONDEO1_R * 0.02), (REDONDEO1_R, 0))
        make_face()
    redondeo1_piece_11a = extrude(amount=20, mode=Mode.PRIVATE)
    redondeo1_piece_11a = split(redondeo1_piece_11a, bisect_by=Plane(origin=(36.36802442866585, 16.43, 37.88407860347026), z_dir=(0, -1, 0)), keep=Keep.TOP, mode=Mode.PRIVATE)
    redondeo1_piece_11a = split(redondeo1_piece_11a, bisect_by=Plane(origin=(36.36802442866584, 11.965, 37.88407860347026), z_dir=(0, 1, 0)), keep=Keep.TOP, mode=Mode.PRIVATE)
    with BuildSketch(Plane(origin=(37.50000000000002, 11.965, 49.18034078935661), x_dir=(-6.37e-15, 1, 0), z_dir=(0, 0, -1))) as redondeo1_piece_11b_section:
        with BuildLine():
            CenterArc((5.000000000000032, -4.971295102888174), REDONDEO1_R, 96.14240739102014, 83.85759260898021)
            Line((3.164e-14, -4.971295102888206), (-0.099999999999968, -4.971295102888207))
            Line((-0.099999999999968, -4.971295102888207), (-0.09999999999999964, -6.4e-16))
            Line((-0.09999999999999964, -6.4e-16), (-6.4e-16, 0.10000000000000142))
            ThreePointArc((-6.4e-16, 0.10000000000000142), (2.2324999999999995, 0.10000000000001563), (4.454299999999999, 0.09942590205776007))
            Line((4.454299999999999, 0.09942590205776007), (4.465, 0))
        make_face()
    redondeo1_piece_11b = extrude(amount=85.93244382149274, mode=Mode.PRIVATE)
    redondeo1_piece_11b = split(redondeo1_piece_11b, bisect_by=Plane(origin=(36.35861517531313, 13.041108912972746, 36.752103032136134), z_dir=(0, 0, 1)), keep=Keep.TOP, mode=Mode.PRIVATE)
    redondeo1_piece_11 = redondeo1_piece_11a & redondeo1_piece_11b
    add(redondeo1_piece_11)
    with BuildSketch(Plane(origin=(37.50000000000001, 11.965, 36.752103032136134), x_dir=(-3.18e-15, 1, 0), z_dir=(0, 0, -1))) as redondeo1_piece_12a_section:
        with BuildLine():
            CenterArc((5.000000000000016, -4.971295102888176), REDONDEO1_R, 96.14240739101996, 83.85759260898021)
            Line((1.582e-14, -4.971295102888192), (-0.09999999999998382, -4.971295102888192))
            Line((-0.09999999999998382, -4.971295102888192), (-0.09999999999999964, -3.2e-16))
            Line((-0.09999999999999964, -3.2e-16), (-3.2e-16, 0.10000000000000142))
            ThreePointArc((-3.2e-16, 0.10000000000000142), (2.2324999999999995, 0.10000000000002274), (4.4543, 0.09942590205776011))
            Line((4.4543, 0.09942590205776011), (4.465, 0))
        make_face()
    redondeo1_piece_12a = extrude(amount=85.93244382149273, mode=Mode.PRIVATE)
    redondeo1_piece_12a = split(redondeo1_piece_12a, bisect_by=Plane(origin=(36.35861517531357, 13.04110891297261, -36.752103032136134), z_dir=(0, 0, -1)), keep=Keep.TOP, mode=Mode.PRIVATE)
    with BuildSketch(Plane(origin=(37.50000000000001, 4.465000000000003, -36.752103032136134), x_dir=(0, 0, -1), z_dir=(0, 1, 0))) as redondeo1_piece_12b_section:
        with BuildLine():
            CenterArc((REDONDEO1_R, REDONDEO1_R), REDONDEO1_R, 180, 90)
            Line((0, REDONDEO1_R), (-REDONDEO1_R * 0.02, REDONDEO1_R))
            Line((-REDONDEO1_R * 0.02, REDONDEO1_R), (-REDONDEO1_R * 0.02, -REDONDEO1_R * 0.02))
            Line((-REDONDEO1_R * 0.02, -REDONDEO1_R * 0.02), (REDONDEO1_R, -REDONDEO1_R * 0.02))
            Line((REDONDEO1_R, -REDONDEO1_R * 0.02), (REDONDEO1_R, 0))
        make_face()
    redondeo1_piece_12b = extrude(amount=20, mode=Mode.PRIVATE)
    redondeo1_piece_12b = split(redondeo1_piece_12b, bisect_by=Plane(origin=(36.36802442866586, 16.43, -37.88407860347026), z_dir=(0, -1, 0)), keep=Keep.TOP, mode=Mode.PRIVATE)
    redondeo1_piece_12b = split(redondeo1_piece_12b, bisect_by=Plane(origin=(36.36802442866587, 11.965, -37.88407860347026), z_dir=(0, 1, 0)), keep=Keep.TOP, mode=Mode.PRIVATE)
    redondeo1_piece_12 = redondeo1_piece_12a & redondeo1_piece_12b
    add(redondeo1_piece_12)
    with BuildSketch(Plane(origin=(37.50000000000001, 4.465, -49.18034078935659), x_dir=(-1.59e-15, -1, 0), z_dir=(0, 0, 1))) as redondeo1_piece_13a_section:
        with BuildLine():
            CenterArc((5.000000000000008, -4.971295102888177), REDONDEO1_R, 96.14240739101987, 83.85759260898021)
            Line((7.91e-15, -4.971295102888185), (-0.09999999999999173, -4.971295102888185))
            Line((-0.09999999999999173, -4.971295102888185), (-0.09999999999999964, -1.6e-16))
            Line((-0.09999999999999964, -1.6e-16), (-1.6e-16, 0.10000000000000142))
            ThreePointArc((-1.6e-16, 0.10000000000000142), (2.2325, 0.09999999999999787), (4.4543, 0.09942590205776013))
            Line((4.4543, 0.09942590205776013), (4.465, 0))
        make_face()
    redondeo1_piece_13a = extrude(amount=85.93244382149271, mode=Mode.PRIVATE)
    redondeo1_piece_13a = split(redondeo1_piece_13a, bisect_by=Plane(origin=(36.35861517531293, 3.38889108702688, -36.752103032136134), z_dir=(0, 0, -1)), keep=Keep.TOP, mode=Mode.PRIVATE)
    with BuildSketch(Plane(origin=(37.499999999999986, -8.034999999999997, -36.752103032136134), x_dir=(0, 0, -1), z_dir=(0, 1, 0))) as redondeo1_piece_13b_section:
        with BuildLine():
            CenterArc((REDONDEO1_R, REDONDEO1_R), REDONDEO1_R, 180.00000000000009, 89.99999999999989)
            Line((0, REDONDEO1_R), (-REDONDEO1_R * 0.02, REDONDEO1_R))
            Line((-REDONDEO1_R * 0.02, REDONDEO1_R), (-REDONDEO1_R * 0.02, -REDONDEO1_R * 0.02))
            Line((-REDONDEO1_R * 0.02, -REDONDEO1_R * 0.02), (REDONDEO1_R, -REDONDEO1_R * 0.02))
            Line((REDONDEO1_R, -REDONDEO1_R * 0.02), (REDONDEO1_R, 0))
        make_face()
    redondeo1_piece_13b = extrude(amount=20, mode=Mode.PRIVATE)
    redondeo1_piece_13b = split(redondeo1_piece_13b, bisect_by=Plane(origin=(36.368024428665855, 0, -37.88407860347026), z_dir=(0, 1, 0)), keep=Keep.TOP, mode=Mode.PRIVATE)
    redondeo1_piece_13b = split(redondeo1_piece_13b, bisect_by=Plane(origin=(36.368024428665855, 4.465, -37.88407860347026), z_dir=(0, -1, 0)), keep=Keep.TOP, mode=Mode.PRIVATE)
    redondeo1_piece_13 = redondeo1_piece_13a & redondeo1_piece_13b
    add(redondeo1_piece_13)
    with BuildSketch(Plane(origin=(37.50000000000001, 4.465, -36.752103032136134), x_dir=(-1.59e-15, -1, 0), z_dir=(0, 0, 1))) as redondeo1_piece_14a_section:
        with BuildLine():
            CenterArc((5.000000000000008, -4.971295102888177), REDONDEO1_R, 96.14240739101987, 83.85759260898021)
            Line((7.91e-15, -4.971295102888185), (-0.09999999999999173, -4.971295102888185))
            Line((-0.09999999999999173, -4.971295102888185), (-0.09999999999999964, -1.6e-16))
            Line((-0.09999999999999964, -1.6e-16), (-1.6e-16, 0.10000000000000142))
            ThreePointArc((-1.6e-16, 0.10000000000000142), (2.2325, 0.09999999999999787), (4.4543, 0.09942590205776013))
            Line((4.4543, 0.09942590205776013), (4.465, 0))
        make_face()
    redondeo1_piece_14a = extrude(amount=85.93244382149273, mode=Mode.PRIVATE)
    redondeo1_piece_14a = split(redondeo1_piece_14a, bisect_by=Plane(origin=(36.35861517531297, 3.3888910870269298, 36.752103032136134), z_dir=(0, 0, 1)), keep=Keep.TOP, mode=Mode.PRIVATE)
    with BuildSketch(Plane(origin=(37.499999999999986, -8.034999999999997, 36.752103032136134), x_dir=(0, 0, 1), z_dir=(0, 1, 0))) as redondeo1_piece_14b_section:
        with BuildLine():
            CenterArc((REDONDEO1_R, -REDONDEO1_R), REDONDEO1_R, 90, 90)
            Line((0, -REDONDEO1_R), (-REDONDEO1_R * 0.02, -REDONDEO1_R))
            Line((-REDONDEO1_R * 0.02, -REDONDEO1_R), (-REDONDEO1_R * 0.02, REDONDEO1_R * 0.02))
            Line((-REDONDEO1_R * 0.02, REDONDEO1_R * 0.02), (REDONDEO1_R, REDONDEO1_R * 0.02))
            Line((REDONDEO1_R, REDONDEO1_R * 0.02), (REDONDEO1_R, 0))
        make_face()
    redondeo1_piece_14b = extrude(amount=20, mode=Mode.PRIVATE)
    redondeo1_piece_14b = split(redondeo1_piece_14b, bisect_by=Plane(origin=(36.36802442866586, 0, 37.88407860347026), z_dir=(0, 1, 0)), keep=Keep.TOP, mode=Mode.PRIVATE)
    redondeo1_piece_14b = split(redondeo1_piece_14b, bisect_by=Plane(origin=(36.36802442866586, 4.465, 37.88407860347026), z_dir=(0, -1, 0)), keep=Keep.TOP, mode=Mode.PRIVATE)
    redondeo1_piece_14 = redondeo1_piece_14a & redondeo1_piece_14b
    add(redondeo1_piece_14)

    # Croquis7 → Cortar-Extruir4 (cut, two sides: drawn at the far end of the back side and taken through both)
    with BuildSketch(Plane.XY.offset(-CORTAR_EXTRUIR4_DEPTH_BACK)):
        Polygon((-54.99999999999999, 12.214999999999998), (-46.99999999999999, 12.215000000000003), (-46.99999999999999, 4.215000000000002), (-54.99999999999999, 4.215000000000002), align=None)
        Polygon((46.99999999999999, 12.215000000000003), (46.99999999999999, 4.215000000000002), (54.99999999999999, 4.215000000000002), (54.99999999999999, 12.214999999999998), align=None)
    extrude(amount=CORTAR_EXTRUIR4_DEPTH + CORTAR_EXTRUIR4_DEPTH_BACK, mode=Mode.SUBTRACT)

    # Croquis8 → Cortar-Extruir5 (cut, two sides: drawn at the far end of the back side and taken through both)
    with BuildSketch(Plane(origin=(0, 4.215000000000002, 0), x_dir=(1, 0, 0), z_dir=(0, 1, 0)).offset(-CORTAR_EXTRUIR5_DEPTH_BACK)):
        with Locations(Location((-50.99999999999999, 35.99019513592787, 0), (0, 0, 270))):
            Circle(CROQUIS8_R)
        with Locations(Location((-50.99999999999999, -35.99019513592787, 0), (0, 0, 270))):
            Circle(CROQUIS8_R)
        with Locations((50.99999999999999, -35.99019513592787)):
            Circle(CROQUIS8_R)
        with Locations((50.99999999999999, 35.99019513592787)):
            Circle(CROQUIS8_R)
    extrude(amount=CORTAR_EXTRUIR5_DEPTH + CORTAR_EXTRUIR5_DEPTH_BACK, mode=Mode.SUBTRACT)


solid = part.part
